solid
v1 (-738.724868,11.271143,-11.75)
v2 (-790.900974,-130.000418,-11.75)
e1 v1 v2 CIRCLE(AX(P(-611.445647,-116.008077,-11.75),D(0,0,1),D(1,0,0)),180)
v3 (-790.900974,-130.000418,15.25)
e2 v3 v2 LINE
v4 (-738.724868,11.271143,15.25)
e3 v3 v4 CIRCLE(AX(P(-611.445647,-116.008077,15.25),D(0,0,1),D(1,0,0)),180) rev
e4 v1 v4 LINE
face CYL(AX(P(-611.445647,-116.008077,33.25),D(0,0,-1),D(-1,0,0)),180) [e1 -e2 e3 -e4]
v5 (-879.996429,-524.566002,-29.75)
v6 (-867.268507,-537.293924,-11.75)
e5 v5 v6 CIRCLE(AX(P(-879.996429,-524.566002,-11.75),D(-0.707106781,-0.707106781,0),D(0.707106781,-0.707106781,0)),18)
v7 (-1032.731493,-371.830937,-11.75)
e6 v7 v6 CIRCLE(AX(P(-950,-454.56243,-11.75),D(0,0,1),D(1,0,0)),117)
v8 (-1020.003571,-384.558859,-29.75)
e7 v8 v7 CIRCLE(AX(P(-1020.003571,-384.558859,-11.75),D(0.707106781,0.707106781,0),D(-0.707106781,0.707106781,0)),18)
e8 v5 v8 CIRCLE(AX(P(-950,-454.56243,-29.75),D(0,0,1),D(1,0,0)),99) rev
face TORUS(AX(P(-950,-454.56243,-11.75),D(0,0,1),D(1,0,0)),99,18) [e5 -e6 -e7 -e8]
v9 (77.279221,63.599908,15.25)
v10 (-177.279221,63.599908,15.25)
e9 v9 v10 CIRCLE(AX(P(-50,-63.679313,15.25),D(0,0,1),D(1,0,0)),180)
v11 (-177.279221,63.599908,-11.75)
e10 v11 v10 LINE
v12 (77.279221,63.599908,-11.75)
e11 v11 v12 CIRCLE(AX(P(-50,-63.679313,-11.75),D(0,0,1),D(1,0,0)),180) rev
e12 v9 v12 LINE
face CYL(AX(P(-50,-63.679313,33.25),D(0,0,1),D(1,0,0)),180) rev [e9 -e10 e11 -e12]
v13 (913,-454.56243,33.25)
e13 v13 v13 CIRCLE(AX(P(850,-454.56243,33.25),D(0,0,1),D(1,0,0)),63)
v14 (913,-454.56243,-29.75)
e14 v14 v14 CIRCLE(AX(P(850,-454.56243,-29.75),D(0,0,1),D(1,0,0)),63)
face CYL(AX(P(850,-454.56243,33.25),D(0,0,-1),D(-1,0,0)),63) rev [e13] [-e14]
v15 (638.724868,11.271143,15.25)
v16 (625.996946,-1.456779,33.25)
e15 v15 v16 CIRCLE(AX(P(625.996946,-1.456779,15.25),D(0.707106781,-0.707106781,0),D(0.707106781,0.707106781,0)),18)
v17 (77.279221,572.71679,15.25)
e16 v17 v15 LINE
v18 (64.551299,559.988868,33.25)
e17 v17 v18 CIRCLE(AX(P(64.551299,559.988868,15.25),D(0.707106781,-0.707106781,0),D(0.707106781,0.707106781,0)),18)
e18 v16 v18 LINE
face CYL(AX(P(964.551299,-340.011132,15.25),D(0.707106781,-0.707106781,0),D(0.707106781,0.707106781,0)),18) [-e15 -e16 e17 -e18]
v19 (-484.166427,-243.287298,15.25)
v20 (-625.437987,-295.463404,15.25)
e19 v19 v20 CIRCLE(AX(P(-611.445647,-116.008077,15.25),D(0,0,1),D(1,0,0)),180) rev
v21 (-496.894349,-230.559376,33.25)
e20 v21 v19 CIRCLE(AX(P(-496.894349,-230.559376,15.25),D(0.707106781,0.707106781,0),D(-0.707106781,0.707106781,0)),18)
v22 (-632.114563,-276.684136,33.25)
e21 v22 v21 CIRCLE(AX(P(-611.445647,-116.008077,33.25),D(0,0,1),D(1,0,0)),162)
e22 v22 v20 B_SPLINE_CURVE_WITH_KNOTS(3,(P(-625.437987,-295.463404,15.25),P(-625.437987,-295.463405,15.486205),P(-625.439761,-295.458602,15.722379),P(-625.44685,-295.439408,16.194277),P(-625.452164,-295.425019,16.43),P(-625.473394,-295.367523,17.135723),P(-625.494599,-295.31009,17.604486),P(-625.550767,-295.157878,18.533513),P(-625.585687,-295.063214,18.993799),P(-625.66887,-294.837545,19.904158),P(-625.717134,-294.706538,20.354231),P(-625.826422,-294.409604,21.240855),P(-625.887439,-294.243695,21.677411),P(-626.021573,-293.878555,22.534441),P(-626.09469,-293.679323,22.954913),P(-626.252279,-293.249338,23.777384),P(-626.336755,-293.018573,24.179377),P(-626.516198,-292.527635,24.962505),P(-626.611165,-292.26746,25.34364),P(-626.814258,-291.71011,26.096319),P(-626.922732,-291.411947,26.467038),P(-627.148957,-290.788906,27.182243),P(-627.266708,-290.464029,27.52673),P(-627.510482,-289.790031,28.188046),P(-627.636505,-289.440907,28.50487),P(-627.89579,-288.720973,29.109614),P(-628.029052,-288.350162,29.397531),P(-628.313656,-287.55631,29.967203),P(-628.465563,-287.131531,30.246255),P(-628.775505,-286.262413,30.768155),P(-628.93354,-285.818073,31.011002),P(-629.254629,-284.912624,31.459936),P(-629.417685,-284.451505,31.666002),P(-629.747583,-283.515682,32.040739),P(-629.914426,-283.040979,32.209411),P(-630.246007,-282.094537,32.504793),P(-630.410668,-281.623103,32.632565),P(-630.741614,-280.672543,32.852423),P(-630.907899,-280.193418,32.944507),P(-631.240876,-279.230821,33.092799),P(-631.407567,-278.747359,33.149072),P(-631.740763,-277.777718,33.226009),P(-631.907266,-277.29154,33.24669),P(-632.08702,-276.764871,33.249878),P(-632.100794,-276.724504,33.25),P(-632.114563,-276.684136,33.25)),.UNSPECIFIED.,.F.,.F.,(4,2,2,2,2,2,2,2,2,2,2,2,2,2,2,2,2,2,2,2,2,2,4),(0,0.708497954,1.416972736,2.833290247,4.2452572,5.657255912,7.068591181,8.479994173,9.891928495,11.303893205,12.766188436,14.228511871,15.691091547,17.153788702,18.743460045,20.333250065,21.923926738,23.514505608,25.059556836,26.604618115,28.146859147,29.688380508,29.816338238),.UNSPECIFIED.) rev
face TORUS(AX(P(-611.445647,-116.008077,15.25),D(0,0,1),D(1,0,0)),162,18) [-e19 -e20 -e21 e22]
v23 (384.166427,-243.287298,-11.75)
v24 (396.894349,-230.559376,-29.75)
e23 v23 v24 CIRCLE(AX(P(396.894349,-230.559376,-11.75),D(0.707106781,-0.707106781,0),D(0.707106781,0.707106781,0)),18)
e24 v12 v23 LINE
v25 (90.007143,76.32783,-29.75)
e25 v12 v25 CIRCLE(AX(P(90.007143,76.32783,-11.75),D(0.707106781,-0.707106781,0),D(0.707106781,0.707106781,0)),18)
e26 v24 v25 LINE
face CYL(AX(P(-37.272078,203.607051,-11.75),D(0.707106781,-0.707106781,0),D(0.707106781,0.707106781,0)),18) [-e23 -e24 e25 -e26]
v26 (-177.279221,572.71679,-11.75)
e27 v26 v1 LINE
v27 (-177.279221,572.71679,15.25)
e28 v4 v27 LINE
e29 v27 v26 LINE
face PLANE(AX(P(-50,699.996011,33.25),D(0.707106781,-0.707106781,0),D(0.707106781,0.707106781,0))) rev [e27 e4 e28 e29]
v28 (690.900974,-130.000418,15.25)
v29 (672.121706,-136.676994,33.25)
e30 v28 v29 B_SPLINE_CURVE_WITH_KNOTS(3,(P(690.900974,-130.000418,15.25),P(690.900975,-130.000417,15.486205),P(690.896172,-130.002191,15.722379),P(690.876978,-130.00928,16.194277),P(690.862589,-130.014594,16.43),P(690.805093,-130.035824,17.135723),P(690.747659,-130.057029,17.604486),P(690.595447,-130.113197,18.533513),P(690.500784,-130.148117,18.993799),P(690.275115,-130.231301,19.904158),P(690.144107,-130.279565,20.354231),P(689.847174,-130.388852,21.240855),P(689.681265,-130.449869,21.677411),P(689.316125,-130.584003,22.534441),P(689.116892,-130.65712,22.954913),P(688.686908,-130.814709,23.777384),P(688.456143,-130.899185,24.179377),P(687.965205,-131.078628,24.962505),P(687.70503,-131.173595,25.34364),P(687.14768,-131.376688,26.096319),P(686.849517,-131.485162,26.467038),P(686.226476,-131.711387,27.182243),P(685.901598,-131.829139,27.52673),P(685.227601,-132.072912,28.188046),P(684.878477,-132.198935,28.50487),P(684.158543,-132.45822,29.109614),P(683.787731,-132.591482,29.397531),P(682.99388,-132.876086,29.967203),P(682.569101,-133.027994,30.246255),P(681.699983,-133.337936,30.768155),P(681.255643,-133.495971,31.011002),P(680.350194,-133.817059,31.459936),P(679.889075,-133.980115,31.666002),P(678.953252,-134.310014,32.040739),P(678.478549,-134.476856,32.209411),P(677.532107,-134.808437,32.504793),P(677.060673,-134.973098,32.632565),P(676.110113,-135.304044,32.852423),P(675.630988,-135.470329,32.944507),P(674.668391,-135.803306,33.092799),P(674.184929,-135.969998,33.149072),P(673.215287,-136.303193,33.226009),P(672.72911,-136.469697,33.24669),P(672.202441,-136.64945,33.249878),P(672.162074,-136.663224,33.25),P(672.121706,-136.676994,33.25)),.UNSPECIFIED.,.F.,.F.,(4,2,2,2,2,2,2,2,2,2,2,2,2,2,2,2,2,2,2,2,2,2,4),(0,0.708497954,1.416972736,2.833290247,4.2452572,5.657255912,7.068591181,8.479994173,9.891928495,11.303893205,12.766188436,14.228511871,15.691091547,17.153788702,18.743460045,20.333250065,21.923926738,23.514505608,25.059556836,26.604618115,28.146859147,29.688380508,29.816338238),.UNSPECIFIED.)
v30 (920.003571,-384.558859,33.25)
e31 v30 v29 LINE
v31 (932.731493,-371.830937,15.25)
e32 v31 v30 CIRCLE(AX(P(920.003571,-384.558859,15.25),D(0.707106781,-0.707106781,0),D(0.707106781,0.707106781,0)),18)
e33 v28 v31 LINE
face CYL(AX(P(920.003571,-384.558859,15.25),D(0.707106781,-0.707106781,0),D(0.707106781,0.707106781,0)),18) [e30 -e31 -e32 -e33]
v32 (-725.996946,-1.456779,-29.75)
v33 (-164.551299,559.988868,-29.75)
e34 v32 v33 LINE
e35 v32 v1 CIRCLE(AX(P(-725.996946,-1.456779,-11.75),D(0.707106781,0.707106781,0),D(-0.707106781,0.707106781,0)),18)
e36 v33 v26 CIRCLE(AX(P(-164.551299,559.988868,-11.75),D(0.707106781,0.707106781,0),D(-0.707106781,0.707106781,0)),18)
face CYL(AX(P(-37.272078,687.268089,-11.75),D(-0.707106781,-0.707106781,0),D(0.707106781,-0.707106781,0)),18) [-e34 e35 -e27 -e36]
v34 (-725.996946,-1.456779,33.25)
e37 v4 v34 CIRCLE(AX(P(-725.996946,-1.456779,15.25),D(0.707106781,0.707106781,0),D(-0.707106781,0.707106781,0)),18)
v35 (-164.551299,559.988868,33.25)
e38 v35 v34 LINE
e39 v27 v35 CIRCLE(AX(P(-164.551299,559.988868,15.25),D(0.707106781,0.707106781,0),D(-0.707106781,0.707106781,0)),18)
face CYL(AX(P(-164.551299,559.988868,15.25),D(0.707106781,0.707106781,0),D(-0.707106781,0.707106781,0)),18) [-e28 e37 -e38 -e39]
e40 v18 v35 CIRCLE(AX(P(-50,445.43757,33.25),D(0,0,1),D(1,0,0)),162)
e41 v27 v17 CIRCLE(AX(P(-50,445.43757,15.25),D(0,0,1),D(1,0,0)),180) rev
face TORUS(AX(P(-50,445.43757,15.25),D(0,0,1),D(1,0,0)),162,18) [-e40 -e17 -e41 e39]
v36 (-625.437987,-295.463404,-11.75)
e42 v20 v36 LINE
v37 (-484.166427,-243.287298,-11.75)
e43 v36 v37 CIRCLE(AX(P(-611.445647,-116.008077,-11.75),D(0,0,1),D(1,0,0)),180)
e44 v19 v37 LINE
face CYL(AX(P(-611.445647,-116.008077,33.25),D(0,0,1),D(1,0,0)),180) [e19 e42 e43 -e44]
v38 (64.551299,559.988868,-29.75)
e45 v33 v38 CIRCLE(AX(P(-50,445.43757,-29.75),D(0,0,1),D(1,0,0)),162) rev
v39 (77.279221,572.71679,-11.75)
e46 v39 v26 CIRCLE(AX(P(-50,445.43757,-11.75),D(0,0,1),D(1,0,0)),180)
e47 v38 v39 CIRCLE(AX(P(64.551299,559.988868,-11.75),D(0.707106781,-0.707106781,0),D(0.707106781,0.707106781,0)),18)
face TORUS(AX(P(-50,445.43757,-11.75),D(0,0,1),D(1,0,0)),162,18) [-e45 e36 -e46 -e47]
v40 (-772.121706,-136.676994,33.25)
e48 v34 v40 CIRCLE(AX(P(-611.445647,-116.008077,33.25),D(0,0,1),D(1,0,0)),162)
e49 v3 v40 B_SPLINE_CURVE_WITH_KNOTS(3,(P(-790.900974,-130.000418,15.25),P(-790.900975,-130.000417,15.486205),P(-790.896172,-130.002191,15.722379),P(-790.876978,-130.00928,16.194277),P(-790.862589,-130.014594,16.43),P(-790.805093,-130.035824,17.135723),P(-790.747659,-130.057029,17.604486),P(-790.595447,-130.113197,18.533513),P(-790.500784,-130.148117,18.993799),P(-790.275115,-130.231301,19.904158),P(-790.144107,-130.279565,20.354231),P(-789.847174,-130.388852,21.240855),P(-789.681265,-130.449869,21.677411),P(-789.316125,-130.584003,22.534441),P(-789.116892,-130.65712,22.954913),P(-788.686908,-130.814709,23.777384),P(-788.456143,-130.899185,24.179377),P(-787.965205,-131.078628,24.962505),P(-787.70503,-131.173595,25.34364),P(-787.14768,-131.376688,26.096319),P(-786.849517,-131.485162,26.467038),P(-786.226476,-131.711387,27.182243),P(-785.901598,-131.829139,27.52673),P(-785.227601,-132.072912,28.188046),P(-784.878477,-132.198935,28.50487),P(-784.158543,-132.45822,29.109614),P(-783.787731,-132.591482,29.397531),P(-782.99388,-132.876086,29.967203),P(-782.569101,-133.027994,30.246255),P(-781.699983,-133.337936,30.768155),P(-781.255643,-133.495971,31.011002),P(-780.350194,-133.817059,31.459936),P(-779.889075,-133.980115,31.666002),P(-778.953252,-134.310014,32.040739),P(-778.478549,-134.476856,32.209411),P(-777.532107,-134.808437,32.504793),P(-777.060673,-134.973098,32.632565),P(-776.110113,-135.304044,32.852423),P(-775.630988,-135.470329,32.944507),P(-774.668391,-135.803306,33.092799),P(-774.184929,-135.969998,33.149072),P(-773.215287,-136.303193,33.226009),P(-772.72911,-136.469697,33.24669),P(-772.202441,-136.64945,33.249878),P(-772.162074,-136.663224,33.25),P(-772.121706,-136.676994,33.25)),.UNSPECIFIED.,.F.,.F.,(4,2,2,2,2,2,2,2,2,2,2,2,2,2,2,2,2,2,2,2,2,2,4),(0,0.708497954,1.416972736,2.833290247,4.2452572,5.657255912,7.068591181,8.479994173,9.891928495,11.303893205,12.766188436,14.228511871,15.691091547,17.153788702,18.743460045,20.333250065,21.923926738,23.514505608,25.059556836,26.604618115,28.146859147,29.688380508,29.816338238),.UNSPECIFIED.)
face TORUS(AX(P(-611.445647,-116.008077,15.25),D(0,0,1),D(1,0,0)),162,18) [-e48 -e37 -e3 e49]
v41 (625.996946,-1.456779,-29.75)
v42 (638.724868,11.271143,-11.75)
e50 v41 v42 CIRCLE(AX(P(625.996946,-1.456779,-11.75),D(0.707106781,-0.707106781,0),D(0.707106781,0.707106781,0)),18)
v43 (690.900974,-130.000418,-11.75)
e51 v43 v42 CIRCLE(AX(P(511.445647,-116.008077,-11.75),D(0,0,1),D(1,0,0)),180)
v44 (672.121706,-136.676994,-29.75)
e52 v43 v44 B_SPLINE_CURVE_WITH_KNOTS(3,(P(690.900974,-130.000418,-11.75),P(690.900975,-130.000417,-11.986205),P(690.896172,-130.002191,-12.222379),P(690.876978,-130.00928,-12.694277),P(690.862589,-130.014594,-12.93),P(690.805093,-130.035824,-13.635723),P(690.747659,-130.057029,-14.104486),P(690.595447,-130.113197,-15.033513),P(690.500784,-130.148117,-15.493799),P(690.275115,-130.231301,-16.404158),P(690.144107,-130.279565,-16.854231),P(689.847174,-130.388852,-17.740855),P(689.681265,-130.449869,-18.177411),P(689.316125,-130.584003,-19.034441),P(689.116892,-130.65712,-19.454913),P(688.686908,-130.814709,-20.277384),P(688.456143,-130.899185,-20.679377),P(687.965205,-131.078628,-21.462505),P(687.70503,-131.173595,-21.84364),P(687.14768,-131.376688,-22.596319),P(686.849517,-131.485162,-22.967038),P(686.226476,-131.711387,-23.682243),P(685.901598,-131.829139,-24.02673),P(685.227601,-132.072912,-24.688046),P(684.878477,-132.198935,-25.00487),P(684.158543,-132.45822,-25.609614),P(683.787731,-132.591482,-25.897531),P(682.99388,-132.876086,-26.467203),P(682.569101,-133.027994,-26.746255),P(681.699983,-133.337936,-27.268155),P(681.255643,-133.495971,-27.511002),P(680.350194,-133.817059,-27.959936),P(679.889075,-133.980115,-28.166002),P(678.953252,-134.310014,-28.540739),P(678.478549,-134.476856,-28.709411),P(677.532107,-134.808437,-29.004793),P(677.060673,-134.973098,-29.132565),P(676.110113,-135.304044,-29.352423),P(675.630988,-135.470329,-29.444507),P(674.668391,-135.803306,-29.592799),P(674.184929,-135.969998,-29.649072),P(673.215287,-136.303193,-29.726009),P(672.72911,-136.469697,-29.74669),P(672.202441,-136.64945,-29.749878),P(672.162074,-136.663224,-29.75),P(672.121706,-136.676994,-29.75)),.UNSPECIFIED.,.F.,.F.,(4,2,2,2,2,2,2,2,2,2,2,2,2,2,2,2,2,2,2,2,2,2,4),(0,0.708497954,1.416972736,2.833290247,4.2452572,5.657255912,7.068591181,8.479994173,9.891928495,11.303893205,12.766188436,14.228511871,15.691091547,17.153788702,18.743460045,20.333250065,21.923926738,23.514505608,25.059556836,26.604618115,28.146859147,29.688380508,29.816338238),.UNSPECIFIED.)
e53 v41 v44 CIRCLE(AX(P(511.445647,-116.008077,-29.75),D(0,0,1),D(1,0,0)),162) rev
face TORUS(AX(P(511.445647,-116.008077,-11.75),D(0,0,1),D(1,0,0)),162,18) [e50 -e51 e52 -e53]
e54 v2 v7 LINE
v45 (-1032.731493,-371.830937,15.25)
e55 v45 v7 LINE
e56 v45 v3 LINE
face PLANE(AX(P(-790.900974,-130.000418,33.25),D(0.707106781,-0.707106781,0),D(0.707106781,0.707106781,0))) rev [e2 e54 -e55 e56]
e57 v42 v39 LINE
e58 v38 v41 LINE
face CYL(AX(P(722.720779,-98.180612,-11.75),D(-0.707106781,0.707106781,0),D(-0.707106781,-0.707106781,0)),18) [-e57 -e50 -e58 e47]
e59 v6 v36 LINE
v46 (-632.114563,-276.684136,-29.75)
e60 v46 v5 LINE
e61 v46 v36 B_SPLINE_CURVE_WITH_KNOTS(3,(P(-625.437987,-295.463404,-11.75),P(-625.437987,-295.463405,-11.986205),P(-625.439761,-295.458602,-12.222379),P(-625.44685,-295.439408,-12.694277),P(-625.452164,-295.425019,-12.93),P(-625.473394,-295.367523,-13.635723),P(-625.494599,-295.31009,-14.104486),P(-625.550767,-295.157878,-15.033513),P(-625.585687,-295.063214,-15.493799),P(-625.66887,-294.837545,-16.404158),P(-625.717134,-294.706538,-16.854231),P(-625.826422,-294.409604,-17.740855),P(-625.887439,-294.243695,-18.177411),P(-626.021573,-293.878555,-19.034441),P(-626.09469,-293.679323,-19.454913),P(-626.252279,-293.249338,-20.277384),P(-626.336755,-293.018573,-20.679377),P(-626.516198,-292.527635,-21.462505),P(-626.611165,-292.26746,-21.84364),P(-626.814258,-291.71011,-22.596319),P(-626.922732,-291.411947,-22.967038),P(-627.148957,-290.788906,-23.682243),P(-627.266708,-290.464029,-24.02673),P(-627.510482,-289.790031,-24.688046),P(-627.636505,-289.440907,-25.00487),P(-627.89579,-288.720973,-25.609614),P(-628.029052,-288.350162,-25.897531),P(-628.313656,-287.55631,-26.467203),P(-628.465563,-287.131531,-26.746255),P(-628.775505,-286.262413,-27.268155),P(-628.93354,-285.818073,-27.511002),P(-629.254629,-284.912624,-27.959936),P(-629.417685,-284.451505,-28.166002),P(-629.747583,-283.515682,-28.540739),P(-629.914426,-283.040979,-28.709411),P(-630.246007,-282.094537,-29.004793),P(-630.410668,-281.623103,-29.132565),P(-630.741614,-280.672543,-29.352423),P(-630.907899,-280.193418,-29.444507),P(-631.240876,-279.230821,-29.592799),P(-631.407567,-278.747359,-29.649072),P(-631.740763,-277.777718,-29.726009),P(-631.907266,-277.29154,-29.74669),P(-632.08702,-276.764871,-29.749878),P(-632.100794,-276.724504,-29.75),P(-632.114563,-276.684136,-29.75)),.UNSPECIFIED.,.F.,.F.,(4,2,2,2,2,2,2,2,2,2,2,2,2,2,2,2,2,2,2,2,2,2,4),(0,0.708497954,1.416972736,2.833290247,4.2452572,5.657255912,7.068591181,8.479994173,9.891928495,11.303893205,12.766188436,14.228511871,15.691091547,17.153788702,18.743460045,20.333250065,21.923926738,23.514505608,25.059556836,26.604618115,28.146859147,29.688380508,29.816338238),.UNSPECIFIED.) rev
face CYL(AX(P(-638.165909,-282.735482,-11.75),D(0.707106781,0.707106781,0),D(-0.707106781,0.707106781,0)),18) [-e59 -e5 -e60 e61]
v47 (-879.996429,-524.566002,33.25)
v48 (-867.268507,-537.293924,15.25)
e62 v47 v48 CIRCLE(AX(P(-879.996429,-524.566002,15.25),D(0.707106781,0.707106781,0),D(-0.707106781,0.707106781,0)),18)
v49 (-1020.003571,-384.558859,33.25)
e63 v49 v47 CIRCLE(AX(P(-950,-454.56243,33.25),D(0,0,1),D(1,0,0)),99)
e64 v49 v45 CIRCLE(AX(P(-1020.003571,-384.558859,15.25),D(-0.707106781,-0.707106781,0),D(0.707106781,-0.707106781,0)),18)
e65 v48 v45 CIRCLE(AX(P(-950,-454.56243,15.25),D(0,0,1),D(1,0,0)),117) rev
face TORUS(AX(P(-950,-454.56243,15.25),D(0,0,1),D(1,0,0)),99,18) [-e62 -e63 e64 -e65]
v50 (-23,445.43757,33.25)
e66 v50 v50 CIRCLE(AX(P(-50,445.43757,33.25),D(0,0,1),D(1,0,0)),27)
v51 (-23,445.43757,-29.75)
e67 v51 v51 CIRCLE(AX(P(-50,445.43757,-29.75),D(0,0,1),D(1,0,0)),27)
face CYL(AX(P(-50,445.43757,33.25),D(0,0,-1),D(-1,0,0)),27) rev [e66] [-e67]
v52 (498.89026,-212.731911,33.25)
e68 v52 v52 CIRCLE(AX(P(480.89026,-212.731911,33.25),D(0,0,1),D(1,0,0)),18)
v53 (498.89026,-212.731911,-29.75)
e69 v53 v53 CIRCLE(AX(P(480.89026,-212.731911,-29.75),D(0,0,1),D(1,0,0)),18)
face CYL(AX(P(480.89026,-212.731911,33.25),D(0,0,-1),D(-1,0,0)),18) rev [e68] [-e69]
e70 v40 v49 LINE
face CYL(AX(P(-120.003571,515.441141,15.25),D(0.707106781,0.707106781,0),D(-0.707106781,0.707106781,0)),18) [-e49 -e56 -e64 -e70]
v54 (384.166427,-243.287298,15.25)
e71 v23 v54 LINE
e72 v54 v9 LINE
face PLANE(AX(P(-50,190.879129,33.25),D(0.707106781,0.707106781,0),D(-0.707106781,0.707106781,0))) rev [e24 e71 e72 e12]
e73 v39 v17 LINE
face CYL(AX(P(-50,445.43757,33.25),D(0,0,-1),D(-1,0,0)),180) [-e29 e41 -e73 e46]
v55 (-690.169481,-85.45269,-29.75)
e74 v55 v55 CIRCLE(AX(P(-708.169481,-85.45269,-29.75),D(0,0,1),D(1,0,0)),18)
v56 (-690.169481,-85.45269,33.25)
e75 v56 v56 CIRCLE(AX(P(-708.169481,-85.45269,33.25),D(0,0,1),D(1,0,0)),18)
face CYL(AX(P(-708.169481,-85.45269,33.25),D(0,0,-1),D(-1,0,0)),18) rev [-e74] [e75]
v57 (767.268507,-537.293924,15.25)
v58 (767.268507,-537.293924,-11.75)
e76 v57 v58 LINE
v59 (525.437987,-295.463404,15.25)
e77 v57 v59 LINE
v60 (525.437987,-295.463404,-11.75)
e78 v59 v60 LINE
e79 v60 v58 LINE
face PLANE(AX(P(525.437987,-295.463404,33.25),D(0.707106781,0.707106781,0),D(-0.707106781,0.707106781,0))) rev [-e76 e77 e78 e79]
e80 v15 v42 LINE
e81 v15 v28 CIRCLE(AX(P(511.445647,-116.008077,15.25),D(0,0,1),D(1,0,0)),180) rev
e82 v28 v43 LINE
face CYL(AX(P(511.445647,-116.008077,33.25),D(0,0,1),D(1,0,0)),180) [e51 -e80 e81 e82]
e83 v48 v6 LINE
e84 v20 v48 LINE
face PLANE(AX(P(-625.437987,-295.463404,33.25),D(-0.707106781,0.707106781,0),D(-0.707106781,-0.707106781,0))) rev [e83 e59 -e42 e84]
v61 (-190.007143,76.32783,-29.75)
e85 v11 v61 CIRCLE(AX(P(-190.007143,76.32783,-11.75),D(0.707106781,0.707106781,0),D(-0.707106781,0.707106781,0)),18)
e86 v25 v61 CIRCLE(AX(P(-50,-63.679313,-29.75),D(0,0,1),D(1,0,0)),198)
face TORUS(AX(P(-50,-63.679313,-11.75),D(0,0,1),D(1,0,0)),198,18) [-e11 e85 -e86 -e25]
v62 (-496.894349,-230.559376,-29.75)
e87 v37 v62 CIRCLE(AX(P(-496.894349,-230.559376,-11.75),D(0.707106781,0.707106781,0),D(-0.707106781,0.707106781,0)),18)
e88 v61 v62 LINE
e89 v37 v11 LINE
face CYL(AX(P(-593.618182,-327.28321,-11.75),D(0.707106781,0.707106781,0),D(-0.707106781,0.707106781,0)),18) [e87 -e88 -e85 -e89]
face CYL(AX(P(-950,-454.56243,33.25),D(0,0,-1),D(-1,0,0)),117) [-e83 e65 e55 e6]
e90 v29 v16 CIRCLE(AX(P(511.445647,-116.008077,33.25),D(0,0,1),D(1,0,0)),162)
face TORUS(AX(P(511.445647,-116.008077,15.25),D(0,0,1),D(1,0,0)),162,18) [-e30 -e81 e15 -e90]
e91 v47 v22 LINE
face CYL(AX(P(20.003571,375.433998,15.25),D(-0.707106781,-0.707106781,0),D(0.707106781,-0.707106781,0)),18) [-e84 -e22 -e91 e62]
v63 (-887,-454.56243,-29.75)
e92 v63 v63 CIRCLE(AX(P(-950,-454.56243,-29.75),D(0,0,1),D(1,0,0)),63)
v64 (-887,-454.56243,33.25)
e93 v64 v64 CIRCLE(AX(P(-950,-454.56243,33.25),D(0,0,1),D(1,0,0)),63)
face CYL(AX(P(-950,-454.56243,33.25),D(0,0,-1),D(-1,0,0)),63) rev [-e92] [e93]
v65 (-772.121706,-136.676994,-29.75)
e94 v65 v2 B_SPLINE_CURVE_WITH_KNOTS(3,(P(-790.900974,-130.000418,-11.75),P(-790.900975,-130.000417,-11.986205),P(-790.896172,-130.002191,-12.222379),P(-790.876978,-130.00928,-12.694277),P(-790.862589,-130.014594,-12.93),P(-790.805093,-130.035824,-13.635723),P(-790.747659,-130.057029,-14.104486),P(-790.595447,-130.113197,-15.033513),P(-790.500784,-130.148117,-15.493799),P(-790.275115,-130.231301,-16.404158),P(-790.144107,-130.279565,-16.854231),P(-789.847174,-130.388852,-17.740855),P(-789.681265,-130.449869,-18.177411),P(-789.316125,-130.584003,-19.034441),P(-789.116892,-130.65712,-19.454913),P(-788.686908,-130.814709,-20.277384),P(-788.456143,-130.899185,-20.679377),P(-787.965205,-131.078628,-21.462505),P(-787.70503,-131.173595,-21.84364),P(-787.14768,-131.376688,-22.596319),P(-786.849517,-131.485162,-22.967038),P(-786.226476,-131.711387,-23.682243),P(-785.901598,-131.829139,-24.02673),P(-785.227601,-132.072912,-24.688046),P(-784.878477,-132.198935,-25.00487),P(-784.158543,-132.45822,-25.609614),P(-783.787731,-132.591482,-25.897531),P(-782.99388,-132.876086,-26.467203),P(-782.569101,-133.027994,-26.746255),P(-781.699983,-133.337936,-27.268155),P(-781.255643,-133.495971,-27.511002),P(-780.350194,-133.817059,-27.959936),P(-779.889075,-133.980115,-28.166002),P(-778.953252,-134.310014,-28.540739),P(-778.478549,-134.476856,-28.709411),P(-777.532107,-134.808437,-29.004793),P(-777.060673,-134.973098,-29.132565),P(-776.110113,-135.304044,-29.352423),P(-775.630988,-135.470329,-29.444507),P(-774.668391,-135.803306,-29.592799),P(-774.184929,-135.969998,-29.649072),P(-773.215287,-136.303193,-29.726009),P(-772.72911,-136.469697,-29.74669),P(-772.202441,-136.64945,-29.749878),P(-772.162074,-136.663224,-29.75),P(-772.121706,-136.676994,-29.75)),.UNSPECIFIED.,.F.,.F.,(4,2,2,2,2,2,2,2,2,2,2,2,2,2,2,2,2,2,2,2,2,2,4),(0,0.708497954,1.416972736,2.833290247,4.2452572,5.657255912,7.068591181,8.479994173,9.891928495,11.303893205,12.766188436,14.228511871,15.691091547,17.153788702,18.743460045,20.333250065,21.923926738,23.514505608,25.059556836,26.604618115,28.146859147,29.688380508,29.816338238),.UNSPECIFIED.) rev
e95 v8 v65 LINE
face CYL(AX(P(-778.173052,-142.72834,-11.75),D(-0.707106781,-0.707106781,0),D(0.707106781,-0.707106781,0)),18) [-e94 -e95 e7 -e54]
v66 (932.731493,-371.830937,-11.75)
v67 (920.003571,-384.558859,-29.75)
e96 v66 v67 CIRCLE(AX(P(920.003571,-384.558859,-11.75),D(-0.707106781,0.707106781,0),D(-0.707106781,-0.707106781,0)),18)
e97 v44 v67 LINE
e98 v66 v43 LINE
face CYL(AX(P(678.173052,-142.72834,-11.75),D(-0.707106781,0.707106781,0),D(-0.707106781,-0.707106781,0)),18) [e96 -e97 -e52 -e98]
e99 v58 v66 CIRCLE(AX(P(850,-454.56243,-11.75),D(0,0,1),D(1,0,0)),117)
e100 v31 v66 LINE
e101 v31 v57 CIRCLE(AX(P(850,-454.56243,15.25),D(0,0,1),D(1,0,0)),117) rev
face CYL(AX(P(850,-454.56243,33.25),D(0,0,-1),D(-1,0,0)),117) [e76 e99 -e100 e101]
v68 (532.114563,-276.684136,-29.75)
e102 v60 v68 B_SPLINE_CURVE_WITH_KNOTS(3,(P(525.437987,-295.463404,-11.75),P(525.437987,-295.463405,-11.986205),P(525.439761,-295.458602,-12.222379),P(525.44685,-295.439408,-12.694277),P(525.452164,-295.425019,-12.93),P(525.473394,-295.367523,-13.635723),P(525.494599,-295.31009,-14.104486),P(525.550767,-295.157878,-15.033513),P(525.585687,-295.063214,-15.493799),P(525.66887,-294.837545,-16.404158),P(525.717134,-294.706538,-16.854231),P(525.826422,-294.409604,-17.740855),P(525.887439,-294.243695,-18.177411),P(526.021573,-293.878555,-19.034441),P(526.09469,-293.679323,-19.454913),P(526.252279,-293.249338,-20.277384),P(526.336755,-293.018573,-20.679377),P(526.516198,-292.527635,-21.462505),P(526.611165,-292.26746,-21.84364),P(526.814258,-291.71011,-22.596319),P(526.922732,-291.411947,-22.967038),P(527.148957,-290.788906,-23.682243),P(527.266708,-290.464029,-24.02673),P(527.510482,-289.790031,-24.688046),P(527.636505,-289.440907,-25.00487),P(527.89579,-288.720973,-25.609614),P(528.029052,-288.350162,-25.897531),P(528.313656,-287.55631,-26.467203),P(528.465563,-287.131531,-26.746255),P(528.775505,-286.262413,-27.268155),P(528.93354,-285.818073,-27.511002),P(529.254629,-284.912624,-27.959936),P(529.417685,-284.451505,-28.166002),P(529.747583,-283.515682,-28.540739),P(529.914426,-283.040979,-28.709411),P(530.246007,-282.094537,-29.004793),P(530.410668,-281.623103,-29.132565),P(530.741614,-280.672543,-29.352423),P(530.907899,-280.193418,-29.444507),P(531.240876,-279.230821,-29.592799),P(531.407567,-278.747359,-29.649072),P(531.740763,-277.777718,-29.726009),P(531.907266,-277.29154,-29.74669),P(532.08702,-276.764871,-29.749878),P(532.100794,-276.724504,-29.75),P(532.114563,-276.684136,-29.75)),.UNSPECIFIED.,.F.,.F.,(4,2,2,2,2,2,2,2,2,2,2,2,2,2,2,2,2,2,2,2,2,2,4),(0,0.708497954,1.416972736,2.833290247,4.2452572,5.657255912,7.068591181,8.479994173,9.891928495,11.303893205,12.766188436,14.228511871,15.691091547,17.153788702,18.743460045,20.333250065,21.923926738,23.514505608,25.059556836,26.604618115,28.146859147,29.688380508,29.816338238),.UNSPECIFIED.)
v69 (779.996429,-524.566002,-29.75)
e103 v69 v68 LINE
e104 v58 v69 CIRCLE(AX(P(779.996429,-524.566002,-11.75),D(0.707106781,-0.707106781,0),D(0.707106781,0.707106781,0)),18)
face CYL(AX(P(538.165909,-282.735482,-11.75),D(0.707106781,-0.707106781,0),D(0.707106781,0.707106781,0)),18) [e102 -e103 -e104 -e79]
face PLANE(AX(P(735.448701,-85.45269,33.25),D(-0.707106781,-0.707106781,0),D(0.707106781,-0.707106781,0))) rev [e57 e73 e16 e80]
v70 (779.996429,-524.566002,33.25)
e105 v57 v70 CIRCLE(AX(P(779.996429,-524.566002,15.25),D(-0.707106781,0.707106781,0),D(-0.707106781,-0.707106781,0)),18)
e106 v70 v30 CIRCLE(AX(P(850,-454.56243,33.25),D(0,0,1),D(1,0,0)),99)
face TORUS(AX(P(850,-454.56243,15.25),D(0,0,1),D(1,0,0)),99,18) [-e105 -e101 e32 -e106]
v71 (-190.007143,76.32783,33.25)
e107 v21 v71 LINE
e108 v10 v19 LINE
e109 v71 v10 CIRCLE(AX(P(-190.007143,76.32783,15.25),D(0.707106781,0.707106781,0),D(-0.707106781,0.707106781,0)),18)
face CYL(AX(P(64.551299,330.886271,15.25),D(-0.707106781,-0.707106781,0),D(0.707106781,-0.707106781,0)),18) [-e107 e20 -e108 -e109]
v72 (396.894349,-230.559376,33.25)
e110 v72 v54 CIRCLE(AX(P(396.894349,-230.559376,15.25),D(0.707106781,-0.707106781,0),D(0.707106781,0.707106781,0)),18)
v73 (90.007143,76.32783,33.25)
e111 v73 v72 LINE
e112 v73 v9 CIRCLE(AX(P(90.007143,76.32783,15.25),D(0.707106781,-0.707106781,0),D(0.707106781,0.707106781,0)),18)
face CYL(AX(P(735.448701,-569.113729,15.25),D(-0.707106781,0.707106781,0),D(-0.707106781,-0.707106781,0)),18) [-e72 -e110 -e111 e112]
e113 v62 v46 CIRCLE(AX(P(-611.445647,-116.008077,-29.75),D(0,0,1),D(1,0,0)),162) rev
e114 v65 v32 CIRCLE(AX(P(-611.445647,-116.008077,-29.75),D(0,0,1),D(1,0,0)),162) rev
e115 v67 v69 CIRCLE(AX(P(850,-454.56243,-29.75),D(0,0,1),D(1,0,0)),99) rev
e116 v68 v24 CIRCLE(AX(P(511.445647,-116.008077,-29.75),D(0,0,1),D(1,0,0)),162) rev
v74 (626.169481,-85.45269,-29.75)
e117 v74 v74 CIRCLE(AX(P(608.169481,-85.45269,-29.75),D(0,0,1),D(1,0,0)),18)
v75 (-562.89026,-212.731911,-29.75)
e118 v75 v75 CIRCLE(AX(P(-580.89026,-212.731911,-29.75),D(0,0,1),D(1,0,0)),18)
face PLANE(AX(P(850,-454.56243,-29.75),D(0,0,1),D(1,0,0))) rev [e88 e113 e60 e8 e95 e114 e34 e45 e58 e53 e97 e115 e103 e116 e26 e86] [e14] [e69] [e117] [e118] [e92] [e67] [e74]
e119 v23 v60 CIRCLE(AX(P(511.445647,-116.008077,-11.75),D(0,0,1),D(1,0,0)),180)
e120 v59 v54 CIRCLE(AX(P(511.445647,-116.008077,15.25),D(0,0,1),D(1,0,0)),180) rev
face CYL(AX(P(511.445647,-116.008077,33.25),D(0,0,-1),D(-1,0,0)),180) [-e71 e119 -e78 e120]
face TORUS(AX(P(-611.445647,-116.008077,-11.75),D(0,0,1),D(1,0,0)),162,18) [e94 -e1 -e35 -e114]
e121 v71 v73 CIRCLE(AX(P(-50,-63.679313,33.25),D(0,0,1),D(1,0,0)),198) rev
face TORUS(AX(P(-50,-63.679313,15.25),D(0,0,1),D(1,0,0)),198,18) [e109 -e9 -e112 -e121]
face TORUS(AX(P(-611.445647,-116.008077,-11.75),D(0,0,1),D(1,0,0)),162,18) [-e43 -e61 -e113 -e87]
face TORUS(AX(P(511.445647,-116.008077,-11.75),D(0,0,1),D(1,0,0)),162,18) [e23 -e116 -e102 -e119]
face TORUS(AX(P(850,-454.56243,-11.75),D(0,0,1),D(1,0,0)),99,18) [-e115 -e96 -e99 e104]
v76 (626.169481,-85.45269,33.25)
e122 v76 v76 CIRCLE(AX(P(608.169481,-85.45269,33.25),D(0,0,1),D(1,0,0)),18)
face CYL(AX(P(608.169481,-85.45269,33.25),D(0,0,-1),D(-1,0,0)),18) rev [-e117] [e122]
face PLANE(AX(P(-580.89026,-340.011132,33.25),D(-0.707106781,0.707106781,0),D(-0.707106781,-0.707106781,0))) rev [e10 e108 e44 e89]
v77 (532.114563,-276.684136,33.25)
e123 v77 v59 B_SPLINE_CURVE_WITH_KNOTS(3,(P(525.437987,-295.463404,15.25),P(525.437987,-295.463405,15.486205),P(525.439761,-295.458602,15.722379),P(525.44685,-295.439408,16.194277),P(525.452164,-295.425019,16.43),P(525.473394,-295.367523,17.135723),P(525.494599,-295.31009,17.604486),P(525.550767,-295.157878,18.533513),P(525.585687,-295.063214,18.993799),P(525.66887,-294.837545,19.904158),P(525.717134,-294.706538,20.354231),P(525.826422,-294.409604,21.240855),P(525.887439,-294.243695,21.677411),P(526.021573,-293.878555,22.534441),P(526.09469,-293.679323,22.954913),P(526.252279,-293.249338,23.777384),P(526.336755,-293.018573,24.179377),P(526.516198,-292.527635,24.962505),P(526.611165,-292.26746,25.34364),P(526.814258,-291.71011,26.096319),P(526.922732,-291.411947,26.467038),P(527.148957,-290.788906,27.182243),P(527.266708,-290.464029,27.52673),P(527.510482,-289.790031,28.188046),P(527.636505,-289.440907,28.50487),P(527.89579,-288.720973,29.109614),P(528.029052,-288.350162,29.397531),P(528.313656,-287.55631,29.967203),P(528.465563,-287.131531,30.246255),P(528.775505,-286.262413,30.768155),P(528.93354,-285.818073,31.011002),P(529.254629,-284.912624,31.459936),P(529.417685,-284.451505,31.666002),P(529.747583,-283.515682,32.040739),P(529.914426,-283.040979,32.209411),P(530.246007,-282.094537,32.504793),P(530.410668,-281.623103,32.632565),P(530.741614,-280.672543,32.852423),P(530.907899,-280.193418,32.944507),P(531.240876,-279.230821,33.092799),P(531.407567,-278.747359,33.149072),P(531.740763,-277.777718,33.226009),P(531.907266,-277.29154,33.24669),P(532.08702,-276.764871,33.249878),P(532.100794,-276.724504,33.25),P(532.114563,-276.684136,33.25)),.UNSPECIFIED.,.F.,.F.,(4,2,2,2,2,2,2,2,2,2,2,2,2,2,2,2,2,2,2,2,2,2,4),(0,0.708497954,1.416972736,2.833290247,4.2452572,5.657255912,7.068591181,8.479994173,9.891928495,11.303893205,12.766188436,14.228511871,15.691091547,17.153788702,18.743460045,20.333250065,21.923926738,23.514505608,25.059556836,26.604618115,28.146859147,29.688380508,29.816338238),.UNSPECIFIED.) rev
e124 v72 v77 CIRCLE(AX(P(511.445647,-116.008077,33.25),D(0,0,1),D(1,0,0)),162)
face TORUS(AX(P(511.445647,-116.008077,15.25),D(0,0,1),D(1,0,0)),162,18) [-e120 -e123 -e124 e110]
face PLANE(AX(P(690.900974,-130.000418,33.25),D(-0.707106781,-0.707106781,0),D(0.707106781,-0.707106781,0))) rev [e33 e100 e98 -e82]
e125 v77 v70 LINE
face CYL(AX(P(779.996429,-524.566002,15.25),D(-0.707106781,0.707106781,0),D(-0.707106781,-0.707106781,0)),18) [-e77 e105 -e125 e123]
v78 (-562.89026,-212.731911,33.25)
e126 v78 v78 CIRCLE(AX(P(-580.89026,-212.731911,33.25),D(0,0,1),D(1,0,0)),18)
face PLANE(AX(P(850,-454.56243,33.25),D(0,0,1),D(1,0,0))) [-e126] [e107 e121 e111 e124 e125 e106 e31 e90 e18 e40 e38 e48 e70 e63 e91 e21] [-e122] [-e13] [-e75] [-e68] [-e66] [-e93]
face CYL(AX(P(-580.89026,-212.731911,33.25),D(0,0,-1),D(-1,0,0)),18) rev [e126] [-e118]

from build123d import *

# Parameters (mm, degrees)
SKETCH5_R           = 3.5
SKETCH5_R_2         = 1.5
SKETCH5_R_3         = 1
BOSS_EXTRUDE1_DEPTH = 3.5
FILLET1_R           = 10
FILLET2_R           = 1
SCALE1_SCALE        = 18


with BuildPart() as part:
    # Sketch5 → Boss-Extrude1 (new body)
    with BuildSketch(Plane.XY):
        with BuildLine():
            Line((-18.03122292, 8.838834765), (-4.596194078, -4.596194078))
            ThreePointArc((-4.596194078, -4.596194078), (4.596194078, -4.596194078), (4.596194078, 4.596194078))
            Line((4.596194078, 4.596194078), (-8.838834765, 18.03122292))
            Line((-8.838834765, 18.03122292), (-6.363961031, 20.506096654))
            Line((-6.363961031, 20.506096654), (-50, 64.142135624))
            Line((-50, 64.142135624), (-93.636038969, 20.506096654))
            Line((-93.636038969, 20.506096654), (-91.161165235, 18.03122292))
            Line((-91.161165235, 18.03122292), (-104.596194078, 4.596194078))
            ThreePointArc((-104.596194078, 4.596194078), (-104.596194078, -4.596194078), (-95.403805922, -4.596194078))
            Line((-95.403805922, -4.596194078), (-81.96877708, 8.838834765))
            Line((-81.96877708, 8.838834765), (-79.493903346, 6.363961031))
            Line((-79.493903346, 6.363961031), (-50, 35.857864376))
            Line((-50, 35.857864376), (-20.506096654, 6.363961031))
            Line((-20.506096654, 6.363961031), (-18.03122292, 8.838834765))
        make_face()
        Circle(SKETCH5_R, mode=Mode.SUBTRACT)
        with Locations((-100, 0)):
            Circle(SKETCH5_R, mode=Mode.SUBTRACT)
        with Locations((-50, 50)):
            Circle(SKETCH5_R_2, mode=Mode.SUBTRACT)
        with Locations((-13.435028843, 20.506096654)):
            Circle(SKETCH5_R_3, mode=Mode.SUBTRACT)
        with Locations((-20.506096654, 13.435028843)):
            Circle(SKETCH5_R_3, mode=Mode.SUBTRACT)
        with Locations((-79.493903346, 13.435028843)):
            Circle(SKETCH5_R_3, mode=Mode.SUBTRACT)
        with Locations((-86.564971157, 20.506096654)):
            Circle(SKETCH5_R_3, mode=Mode.SUBTRACT)
    extrude(amount=BOSS_EXTRUDE1_DEPTH)

    # Fillet1
    # the kernel refuses this fillet: 10 mm, written as the material it adds along each edge
    with BuildSketch(Plane(origin=(-50, 35.857864376, 0), x_dir=(0.7071067811865507, -0.7071067811865444, 0), z_dir=(0, 0, 1))) as fillet1_piece_1:
        with BuildLine():
            CenterArc((FILLET1_R, -FILLET1_R), FILLET1_R, 90, 90)
            Line((0, -FILLET1_R), (0, 0))
            Line((0, 0), (FILLET1_R, 0))
        make_face()
    extrude(amount=3.5)
    # the kernel refuses this fillet: 10 mm, written as the material it takes off along each edge
    with BuildSketch(Plane(origin=(-93.636038969, 20.506096654, -18.998355192), x_dir=(0.7071067811865474, 0.7071067811865478, 0), z_dir=(0, 0, 1)), Plane(origin=(-20.506096654, 6.363961031, -18.998355192), x_dir=(-0.7071067811865507, 0.7071067811865445, 0), z_dir=(0, 0, 1))) as fillet1_2_piece_1:
        with BuildLine():
            CenterArc((7.599342077, -10), FILLET1_R, 90, 49.458398126)
            Line((0, -3.5), (0, 0))
            Line((0, 0), (7.599342077, 0))
        make_face()
    extrude(amount=41.496710384, mode=Mode.SUBTRACT)
    with BuildSketch(Plane(origin=(-79.493903346, 6.363961031, -18.998355192), x_dir=(-0.707106781186547, 0.707106781186548, 0), z_dir=(0, 0, 1)), Plane(origin=(-6.363961031, 20.506096654, -18.998355192), x_dir=(-0.7071067811865441, -0.707106781186551, 0), z_dir=(0, 0, 1))) as fillet1_2_piece_2:
        with BuildLine():
            CenterArc((10, -7.599342077), FILLET1_R, 130.541601874, 49.458398126)
            Line((0, -7.599342077), (0, 0))
            Line((0, 0), (3.5, 0))
        make_face()
    extrude(amount=41.496710384, mode=Mode.SUBTRACT)
    with BuildSketch(Plane(origin=(-50, 64.142135624, -25), x_dir=(0.7071067811865497, -0.7071067811865454, 0), z_dir=(0, 0, 1))) as fillet1_2_piece_3:
        with BuildLine():
            CenterArc((FILLET1_R, -FILLET1_R), FILLET1_R, 90, 90)
            Line((0, -FILLET1_R), (0, 0))
            Line((0, 0), (FILLET1_R, 0))
        make_face()
    extrude(amount=53.5, mode=Mode.SUBTRACT)

    # Fillet2
    fillet2_edges = [part.edges().sort_by_distance(p)[0] for p in [
        (-9.427918977, 22.273151555, 3.5),
        (-77.726848445, 9.427918977, 3.5),
        (-90.572081023, 22.273151555, 3.5),
        (-50, 31.715728753, 0),
        (-50, 31.715728753, 3.5),
        (-88.686291501, 2.121320344, 0),
        (-104.596194078, -4.596194078, 0),
        (-97.878679656, 11.313708499, 0),
        (-2.121320344, 11.313708499, 0),
        (4.596194078, -4.596194078, 0),
        (-11.313708499, 2.121320344, 0),
        (-11.313708499, 2.121320344, 3.5),
        (4.596194078, -4.596194078, 3.5),
        (-2.121320344, 11.313708499, 3.5),
        (-97.878679656, 11.313708499, 3.5),
        (-104.596194078, -4.596194078, 3.5),
        (-88.686291501, 2.121320344, 3.5),
        (-72.666780233, 41.475355391, 0),
        (-27.333219767, 41.475355391, 0),
        (-34.404287579, 20.262151955, 0),
        (-65.595712421, 20.262151955, 0),
        (-50, 60, 0),
        (-22.273151555, 9.427918977, 0),
        (-9.427918977, 22.273151555, 0),
        (-77.726848445, 9.427918977, 0),
        (-90.572081023, 22.273151555, 0),
        (-72.666780233, 41.475355391, 3.5),
        (-65.595712421, 20.262151955, 3.5),
        (-34.404287579, 20.262151955, 3.5),
        (-27.333219767, 41.475355391, 3.5),
        (-50, 60, 3.5),
        (-22.273151555, 9.427918977, 3.5),
    ]]
    fillet(fillet2_edges, radius=FILLET2_R)


with BuildPart() as part_1:
    # Scale1: scaled about (-50.000000001, 26.738967737, 1.75)
    add(part.part.scale(SCALE1_SCALE).moved(Location((850.000000017, -454.562451529, -29.75))))


solid = part_1.part
